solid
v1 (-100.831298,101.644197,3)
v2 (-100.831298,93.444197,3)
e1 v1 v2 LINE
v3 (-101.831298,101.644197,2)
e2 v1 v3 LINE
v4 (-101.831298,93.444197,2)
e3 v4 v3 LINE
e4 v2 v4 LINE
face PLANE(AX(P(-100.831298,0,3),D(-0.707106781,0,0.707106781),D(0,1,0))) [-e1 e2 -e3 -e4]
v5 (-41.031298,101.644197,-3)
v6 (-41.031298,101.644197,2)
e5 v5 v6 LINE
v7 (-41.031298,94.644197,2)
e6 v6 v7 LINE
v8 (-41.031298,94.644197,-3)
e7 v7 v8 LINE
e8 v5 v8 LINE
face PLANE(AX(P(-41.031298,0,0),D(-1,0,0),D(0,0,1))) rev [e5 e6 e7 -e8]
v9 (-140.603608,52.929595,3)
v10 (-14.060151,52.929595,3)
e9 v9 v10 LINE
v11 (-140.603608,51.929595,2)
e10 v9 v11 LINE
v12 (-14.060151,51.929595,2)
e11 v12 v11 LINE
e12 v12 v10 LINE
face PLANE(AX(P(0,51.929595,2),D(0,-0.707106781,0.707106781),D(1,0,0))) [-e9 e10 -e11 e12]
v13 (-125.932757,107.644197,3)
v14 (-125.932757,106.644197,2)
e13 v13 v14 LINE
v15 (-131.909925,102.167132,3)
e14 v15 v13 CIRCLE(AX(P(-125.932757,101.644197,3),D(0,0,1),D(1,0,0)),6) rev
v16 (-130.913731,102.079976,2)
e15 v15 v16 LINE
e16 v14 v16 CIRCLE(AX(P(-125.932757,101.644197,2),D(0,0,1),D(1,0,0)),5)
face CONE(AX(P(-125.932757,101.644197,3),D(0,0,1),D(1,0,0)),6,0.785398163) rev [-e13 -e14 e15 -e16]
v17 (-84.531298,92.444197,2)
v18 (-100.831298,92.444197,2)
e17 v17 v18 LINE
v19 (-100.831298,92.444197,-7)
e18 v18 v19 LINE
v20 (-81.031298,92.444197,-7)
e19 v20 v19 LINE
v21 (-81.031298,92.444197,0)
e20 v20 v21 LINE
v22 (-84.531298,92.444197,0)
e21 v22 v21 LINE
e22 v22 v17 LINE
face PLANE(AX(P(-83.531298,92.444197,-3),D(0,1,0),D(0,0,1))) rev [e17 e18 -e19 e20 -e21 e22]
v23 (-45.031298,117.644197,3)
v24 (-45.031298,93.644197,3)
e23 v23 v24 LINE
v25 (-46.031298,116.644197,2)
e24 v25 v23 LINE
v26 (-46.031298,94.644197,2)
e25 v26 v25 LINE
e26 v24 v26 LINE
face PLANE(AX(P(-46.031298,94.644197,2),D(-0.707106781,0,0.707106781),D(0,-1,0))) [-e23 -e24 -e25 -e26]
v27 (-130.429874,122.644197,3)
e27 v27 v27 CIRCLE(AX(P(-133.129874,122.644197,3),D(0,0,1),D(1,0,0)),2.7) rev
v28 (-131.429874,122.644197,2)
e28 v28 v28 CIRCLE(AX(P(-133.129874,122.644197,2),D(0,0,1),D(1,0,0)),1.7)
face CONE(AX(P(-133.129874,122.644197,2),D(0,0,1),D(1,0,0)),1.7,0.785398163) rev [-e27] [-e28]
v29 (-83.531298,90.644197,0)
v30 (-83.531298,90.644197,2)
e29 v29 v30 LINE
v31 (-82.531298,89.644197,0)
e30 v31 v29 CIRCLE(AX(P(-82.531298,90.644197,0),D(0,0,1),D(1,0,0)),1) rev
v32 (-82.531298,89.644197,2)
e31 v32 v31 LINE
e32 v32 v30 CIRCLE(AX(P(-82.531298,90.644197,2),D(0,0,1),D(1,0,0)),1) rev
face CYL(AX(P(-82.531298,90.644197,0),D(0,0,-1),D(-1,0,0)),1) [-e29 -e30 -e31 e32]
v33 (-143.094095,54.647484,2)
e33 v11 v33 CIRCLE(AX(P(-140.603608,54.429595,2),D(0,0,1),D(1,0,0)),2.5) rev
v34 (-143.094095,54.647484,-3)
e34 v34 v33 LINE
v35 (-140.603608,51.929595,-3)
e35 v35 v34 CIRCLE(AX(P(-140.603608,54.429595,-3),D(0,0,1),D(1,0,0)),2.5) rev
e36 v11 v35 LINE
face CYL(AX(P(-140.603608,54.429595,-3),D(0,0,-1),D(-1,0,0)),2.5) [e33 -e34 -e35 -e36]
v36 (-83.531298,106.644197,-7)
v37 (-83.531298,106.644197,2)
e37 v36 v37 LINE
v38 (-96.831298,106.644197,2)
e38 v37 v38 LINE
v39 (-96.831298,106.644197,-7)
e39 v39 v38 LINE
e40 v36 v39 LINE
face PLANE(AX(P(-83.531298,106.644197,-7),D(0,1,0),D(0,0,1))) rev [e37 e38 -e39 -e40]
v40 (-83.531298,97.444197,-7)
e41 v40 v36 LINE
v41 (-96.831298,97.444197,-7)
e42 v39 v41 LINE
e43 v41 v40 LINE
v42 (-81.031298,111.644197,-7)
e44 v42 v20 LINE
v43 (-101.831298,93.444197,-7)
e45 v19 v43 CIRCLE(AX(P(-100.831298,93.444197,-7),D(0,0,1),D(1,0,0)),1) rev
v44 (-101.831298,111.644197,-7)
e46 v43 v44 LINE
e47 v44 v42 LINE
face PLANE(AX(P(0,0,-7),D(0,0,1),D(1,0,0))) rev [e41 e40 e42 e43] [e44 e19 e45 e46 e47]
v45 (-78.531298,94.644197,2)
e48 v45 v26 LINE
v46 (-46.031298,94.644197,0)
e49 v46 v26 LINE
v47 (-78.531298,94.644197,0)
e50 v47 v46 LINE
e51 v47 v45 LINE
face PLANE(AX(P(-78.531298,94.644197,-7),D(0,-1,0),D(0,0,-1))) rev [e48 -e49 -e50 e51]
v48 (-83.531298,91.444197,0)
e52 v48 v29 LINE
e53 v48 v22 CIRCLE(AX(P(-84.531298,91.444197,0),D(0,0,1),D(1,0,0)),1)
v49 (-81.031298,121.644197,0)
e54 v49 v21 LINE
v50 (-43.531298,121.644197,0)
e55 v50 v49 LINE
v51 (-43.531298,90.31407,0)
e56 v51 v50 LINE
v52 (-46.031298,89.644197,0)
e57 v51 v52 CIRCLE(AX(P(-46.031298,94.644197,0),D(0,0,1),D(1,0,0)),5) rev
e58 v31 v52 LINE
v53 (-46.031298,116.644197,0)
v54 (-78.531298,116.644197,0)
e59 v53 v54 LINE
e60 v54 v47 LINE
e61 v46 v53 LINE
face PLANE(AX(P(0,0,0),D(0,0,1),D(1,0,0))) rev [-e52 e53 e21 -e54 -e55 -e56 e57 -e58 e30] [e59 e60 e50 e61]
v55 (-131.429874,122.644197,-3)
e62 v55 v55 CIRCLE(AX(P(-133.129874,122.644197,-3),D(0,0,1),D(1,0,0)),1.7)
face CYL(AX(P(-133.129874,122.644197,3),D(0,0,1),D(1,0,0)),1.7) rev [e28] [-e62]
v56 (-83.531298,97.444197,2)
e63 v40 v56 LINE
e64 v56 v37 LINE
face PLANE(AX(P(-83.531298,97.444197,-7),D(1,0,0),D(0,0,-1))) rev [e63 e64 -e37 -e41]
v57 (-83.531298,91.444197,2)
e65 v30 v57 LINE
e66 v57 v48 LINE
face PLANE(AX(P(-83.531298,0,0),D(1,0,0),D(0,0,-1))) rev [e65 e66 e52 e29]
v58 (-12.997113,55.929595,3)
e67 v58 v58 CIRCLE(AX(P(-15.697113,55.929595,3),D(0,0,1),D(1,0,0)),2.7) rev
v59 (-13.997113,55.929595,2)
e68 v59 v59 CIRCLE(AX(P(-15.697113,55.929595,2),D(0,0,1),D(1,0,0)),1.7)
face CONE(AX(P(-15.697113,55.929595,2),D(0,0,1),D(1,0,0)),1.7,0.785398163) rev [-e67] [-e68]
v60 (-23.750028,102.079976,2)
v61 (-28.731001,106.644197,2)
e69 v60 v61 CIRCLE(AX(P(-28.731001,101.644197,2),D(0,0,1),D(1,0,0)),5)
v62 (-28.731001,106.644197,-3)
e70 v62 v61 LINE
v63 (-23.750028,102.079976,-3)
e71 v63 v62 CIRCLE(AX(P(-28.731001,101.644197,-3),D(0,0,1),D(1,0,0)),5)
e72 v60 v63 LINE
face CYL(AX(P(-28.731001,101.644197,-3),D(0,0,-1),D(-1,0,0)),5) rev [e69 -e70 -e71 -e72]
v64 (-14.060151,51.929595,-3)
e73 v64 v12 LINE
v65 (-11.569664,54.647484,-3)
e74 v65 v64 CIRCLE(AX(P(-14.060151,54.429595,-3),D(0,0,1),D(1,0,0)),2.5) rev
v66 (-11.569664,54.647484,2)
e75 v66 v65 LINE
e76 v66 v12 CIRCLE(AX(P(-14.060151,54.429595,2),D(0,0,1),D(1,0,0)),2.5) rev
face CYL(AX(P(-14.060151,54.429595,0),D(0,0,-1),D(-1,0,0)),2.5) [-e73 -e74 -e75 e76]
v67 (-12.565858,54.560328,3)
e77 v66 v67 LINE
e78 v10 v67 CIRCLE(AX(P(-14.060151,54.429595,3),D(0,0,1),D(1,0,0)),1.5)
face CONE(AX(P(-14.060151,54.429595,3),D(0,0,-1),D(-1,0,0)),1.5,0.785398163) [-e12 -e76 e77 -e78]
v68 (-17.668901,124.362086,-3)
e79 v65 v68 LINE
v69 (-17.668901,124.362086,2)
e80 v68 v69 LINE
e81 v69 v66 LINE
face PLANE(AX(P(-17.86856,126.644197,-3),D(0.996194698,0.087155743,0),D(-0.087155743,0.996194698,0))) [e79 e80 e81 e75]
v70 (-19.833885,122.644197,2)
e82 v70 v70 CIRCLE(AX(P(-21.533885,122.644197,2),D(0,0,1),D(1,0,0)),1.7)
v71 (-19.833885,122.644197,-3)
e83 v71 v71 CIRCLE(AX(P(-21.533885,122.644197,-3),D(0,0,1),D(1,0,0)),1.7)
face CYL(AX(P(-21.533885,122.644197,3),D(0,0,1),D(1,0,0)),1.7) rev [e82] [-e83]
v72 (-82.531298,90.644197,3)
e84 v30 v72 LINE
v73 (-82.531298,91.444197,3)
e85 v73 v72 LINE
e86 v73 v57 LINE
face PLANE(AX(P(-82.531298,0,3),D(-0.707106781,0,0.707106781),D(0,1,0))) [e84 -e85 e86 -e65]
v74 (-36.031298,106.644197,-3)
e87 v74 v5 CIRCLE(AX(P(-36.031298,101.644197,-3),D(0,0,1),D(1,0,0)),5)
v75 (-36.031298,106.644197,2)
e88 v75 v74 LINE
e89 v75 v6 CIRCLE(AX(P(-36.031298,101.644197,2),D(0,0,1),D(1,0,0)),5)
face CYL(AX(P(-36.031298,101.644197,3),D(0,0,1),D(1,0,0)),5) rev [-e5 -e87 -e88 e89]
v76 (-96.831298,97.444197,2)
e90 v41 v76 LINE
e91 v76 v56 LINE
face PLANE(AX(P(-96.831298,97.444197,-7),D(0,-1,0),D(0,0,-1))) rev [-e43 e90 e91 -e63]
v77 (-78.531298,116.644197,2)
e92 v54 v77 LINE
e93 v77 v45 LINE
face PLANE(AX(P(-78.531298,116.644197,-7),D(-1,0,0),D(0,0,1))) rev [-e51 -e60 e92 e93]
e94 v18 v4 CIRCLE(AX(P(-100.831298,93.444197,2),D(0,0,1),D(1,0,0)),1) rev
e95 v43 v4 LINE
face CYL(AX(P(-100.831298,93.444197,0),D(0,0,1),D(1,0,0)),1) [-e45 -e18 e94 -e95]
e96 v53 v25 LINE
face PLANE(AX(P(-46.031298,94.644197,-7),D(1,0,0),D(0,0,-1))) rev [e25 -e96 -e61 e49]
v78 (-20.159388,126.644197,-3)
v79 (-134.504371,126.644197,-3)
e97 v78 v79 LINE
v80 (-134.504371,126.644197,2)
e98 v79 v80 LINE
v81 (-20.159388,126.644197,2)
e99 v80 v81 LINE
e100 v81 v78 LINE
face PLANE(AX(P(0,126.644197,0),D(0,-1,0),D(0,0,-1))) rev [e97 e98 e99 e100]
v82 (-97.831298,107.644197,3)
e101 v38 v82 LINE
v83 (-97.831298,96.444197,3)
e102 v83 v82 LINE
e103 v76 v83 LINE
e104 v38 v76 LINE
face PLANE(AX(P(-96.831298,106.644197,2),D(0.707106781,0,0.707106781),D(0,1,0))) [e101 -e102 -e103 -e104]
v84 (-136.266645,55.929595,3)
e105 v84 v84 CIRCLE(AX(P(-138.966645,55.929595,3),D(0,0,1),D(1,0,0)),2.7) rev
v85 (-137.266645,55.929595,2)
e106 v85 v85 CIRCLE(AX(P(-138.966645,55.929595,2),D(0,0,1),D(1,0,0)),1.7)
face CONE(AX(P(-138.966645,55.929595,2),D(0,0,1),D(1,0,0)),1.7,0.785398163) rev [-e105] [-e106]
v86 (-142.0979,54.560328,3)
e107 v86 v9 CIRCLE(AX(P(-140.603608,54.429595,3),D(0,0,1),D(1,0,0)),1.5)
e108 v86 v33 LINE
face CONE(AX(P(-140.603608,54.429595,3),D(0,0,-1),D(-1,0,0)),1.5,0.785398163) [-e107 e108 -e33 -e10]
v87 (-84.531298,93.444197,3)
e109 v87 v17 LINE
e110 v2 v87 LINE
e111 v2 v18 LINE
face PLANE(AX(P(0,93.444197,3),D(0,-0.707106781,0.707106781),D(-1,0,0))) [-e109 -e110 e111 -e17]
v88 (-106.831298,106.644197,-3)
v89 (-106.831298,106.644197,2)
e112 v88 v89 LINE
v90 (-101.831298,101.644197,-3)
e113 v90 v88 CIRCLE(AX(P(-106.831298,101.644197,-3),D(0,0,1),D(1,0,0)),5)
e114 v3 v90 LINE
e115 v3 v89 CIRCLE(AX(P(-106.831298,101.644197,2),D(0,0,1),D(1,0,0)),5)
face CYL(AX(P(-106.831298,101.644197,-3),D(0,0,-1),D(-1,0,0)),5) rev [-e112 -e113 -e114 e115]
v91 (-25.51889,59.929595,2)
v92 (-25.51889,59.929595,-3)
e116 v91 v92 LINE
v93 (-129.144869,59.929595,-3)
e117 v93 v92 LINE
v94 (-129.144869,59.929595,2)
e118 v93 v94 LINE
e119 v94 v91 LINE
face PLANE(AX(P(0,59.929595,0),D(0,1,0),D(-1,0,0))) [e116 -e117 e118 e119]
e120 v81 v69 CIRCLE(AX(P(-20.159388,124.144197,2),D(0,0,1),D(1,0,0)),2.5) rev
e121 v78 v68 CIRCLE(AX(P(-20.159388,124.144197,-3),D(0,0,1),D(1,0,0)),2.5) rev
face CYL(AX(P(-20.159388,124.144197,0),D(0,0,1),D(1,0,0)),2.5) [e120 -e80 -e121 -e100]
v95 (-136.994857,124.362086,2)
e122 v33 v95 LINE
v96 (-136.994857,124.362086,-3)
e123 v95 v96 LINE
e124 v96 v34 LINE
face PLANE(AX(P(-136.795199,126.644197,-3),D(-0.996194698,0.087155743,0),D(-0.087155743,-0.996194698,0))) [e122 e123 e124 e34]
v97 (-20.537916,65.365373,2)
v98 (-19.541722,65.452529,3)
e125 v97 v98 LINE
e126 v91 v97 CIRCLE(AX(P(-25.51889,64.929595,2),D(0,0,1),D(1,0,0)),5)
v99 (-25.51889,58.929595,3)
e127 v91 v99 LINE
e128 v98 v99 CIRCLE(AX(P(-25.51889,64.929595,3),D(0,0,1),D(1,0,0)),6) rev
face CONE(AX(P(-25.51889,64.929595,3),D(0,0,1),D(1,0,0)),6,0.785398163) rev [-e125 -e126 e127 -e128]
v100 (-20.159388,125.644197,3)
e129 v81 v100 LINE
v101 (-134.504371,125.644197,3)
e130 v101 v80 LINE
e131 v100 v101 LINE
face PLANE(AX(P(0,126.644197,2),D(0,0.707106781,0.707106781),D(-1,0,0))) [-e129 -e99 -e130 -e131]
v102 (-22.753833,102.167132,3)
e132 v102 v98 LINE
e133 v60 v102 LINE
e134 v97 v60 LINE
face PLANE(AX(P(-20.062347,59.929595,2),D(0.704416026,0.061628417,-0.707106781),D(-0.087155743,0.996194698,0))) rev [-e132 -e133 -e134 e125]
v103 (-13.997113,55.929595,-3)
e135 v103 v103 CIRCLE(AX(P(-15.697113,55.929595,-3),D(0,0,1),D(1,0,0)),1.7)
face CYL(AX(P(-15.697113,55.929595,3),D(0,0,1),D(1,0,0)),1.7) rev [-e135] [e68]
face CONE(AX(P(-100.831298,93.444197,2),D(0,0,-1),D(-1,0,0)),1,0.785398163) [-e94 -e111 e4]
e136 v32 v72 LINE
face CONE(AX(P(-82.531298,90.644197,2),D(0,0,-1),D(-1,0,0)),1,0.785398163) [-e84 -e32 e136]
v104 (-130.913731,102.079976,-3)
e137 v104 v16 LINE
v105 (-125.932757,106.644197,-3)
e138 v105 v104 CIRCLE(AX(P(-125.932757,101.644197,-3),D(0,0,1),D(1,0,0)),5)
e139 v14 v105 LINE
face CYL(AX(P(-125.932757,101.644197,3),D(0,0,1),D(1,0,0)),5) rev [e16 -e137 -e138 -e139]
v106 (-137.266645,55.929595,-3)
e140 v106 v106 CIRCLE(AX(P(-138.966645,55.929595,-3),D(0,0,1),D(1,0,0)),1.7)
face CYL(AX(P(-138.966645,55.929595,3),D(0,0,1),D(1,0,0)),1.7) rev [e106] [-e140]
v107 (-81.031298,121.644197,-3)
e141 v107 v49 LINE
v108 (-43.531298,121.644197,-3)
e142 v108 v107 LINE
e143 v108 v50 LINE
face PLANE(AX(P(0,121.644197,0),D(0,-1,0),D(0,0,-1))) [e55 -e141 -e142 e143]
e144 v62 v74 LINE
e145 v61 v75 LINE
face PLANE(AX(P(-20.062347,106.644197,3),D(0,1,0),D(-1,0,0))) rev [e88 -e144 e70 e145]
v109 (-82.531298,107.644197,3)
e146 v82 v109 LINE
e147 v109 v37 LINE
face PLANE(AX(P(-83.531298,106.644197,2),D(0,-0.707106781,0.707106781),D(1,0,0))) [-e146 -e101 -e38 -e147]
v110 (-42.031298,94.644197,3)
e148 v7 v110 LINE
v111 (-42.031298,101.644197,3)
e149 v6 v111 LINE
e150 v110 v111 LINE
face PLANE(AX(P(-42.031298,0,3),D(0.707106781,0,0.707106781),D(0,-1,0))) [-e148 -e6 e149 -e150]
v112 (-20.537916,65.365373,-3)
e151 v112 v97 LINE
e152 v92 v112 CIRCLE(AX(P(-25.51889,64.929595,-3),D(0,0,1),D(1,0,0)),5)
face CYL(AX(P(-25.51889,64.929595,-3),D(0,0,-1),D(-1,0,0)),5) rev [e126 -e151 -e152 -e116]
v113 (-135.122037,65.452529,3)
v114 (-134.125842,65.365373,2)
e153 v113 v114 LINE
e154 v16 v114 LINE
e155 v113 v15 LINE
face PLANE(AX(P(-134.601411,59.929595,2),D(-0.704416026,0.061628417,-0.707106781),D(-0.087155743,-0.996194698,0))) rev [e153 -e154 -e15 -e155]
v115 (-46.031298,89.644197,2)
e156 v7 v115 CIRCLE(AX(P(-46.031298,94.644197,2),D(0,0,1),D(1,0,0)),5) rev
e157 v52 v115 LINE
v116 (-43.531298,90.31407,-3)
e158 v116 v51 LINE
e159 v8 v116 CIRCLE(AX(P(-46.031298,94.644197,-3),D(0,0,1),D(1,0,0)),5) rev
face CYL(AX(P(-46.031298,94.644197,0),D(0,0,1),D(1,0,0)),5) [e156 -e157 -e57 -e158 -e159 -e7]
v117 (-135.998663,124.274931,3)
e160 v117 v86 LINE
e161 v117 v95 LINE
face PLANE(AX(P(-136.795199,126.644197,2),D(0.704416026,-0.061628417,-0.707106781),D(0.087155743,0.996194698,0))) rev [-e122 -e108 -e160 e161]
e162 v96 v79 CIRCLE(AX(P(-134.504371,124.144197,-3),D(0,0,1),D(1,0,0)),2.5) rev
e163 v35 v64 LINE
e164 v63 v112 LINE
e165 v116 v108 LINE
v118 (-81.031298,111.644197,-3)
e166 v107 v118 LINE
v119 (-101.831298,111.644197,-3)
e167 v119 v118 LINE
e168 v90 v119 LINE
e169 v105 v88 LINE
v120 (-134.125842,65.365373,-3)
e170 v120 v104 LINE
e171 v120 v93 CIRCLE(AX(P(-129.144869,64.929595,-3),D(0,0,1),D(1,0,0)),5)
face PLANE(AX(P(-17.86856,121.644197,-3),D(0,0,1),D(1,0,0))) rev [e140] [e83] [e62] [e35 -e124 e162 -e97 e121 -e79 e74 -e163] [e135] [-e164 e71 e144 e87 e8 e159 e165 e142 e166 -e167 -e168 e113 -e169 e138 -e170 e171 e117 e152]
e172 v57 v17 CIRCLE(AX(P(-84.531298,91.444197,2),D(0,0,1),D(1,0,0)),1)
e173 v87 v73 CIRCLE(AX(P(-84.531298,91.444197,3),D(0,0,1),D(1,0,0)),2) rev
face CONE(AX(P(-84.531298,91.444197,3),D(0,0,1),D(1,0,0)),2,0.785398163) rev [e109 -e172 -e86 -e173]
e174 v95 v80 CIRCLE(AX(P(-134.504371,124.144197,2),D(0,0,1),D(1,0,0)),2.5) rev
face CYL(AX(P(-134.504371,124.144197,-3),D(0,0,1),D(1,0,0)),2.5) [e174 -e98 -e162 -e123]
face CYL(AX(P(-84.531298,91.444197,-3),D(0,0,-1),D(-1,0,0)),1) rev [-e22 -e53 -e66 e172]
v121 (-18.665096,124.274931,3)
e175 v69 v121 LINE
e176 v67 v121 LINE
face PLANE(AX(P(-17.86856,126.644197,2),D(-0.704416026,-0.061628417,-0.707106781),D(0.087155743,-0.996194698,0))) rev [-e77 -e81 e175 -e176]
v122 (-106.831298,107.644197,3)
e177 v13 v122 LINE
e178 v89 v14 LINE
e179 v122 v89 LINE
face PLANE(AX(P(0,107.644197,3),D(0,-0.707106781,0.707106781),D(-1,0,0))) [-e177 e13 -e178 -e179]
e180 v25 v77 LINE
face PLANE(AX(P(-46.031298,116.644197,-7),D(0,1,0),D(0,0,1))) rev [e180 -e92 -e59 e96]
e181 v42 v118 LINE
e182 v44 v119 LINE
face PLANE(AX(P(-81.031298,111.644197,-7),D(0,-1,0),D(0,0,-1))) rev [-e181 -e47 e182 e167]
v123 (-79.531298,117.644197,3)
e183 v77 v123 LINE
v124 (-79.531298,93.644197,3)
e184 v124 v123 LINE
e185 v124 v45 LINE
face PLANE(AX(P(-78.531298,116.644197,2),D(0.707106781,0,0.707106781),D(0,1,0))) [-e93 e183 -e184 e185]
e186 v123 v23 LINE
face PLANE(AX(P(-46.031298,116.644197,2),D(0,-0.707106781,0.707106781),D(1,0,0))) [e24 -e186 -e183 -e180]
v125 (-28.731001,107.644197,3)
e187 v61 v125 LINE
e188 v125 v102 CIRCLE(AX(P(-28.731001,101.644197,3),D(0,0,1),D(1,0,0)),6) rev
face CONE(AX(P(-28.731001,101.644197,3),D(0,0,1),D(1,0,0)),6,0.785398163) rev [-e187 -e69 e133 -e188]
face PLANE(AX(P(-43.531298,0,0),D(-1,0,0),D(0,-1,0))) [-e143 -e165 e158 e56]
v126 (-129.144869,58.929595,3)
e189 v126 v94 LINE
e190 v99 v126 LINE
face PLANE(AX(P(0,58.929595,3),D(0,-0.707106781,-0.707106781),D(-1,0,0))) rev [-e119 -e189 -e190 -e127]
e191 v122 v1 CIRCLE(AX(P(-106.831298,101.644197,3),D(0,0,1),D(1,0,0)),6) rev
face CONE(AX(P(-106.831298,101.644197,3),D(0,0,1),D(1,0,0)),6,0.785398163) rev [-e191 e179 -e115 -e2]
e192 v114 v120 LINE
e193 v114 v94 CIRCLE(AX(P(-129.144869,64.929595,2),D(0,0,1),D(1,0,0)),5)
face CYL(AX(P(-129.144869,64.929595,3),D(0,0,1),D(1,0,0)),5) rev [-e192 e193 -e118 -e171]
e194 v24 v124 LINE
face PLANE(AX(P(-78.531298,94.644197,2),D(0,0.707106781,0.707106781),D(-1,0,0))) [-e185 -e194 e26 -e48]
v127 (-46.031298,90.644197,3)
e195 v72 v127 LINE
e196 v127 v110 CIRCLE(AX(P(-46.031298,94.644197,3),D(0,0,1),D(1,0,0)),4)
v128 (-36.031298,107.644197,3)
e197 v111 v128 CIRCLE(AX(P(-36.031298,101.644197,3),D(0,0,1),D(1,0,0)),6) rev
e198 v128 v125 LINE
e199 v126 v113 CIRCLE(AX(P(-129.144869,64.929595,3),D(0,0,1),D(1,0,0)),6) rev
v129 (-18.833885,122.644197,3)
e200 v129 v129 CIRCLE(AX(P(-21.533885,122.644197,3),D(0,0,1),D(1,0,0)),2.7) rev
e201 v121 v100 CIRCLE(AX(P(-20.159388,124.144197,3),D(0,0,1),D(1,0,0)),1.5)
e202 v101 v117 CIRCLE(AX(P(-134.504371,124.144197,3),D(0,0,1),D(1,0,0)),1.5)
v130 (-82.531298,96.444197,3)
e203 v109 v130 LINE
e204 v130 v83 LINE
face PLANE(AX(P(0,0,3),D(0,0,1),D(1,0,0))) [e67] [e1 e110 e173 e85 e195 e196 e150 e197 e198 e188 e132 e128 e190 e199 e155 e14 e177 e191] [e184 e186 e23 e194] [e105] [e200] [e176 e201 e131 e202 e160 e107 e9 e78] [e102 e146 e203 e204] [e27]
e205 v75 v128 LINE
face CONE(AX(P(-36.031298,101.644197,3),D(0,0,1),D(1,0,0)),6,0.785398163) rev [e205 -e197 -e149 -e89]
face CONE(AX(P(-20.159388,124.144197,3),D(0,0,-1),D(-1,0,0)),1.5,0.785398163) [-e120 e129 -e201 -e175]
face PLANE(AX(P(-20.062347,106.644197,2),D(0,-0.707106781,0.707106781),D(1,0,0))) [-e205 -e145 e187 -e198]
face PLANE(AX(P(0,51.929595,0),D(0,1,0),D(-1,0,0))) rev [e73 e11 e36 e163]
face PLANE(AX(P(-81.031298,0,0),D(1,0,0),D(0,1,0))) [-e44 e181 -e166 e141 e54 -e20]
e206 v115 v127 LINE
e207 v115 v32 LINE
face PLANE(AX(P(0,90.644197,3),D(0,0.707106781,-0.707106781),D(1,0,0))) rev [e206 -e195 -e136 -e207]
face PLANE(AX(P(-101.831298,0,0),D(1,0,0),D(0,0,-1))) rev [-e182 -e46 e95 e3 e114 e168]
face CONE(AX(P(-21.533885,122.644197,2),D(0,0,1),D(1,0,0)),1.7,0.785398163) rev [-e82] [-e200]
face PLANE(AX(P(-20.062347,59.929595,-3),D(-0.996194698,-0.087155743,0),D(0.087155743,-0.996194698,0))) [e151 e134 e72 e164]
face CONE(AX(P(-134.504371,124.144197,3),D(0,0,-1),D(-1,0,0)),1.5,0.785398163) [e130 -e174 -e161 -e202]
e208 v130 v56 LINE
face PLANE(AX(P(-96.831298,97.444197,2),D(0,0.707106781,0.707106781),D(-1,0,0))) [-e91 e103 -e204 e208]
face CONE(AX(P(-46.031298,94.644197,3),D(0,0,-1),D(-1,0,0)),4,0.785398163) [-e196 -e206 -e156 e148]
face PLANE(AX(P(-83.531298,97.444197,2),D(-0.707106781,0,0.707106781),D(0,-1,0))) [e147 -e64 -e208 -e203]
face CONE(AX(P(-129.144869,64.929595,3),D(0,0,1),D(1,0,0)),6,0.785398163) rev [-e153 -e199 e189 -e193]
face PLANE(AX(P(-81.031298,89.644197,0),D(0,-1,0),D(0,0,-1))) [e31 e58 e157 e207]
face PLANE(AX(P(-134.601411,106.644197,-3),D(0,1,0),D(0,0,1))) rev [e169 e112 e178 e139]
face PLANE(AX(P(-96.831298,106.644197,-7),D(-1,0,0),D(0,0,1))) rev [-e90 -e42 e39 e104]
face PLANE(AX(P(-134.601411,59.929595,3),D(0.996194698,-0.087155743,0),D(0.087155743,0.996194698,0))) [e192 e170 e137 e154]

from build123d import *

# Parameters (mm, degrees)
SKETCH1_W                 = 37.50000004
SKETCH1_H                 = 31.999999963
BOSS_EXTRUDE1_DEPTH       = 3
SKETCH2_W                 = 6
SKETCH2_H                 = 61.71460232
BOSS_EXTRUDE2_DEPTH       = 25.662738028
SKETCH3_W                 = 63.162738068
SKETCH3_H                 = 6
BOSS_EXTRUDE3_DEPTH       = 5.000000037
SKETCH4_W                 = 63.162738068
SKETCH4_H                 = 6
BOSS_EXTRUDE4_DEPTH       = 8
SKETCH5_W                 = 6
SKETCH5_H                 = 74.714602357
BOSS_EXTRUDE5_DEPTH       = 55.76390052
CUT_EXTRUDE1_DEPTH        = 2.499999998
SKETCH7_W                 = 6
SKETCH7_H                 = 32.514602357
CUT_EXTRUDE2_DEPTH        = 18.3
SKETCH8_W                 = 6
SKETCH8_H                 = 29.714602357
CUT_EXTRUDE3_DEPTH        = 2.5
SKETCH9_W                 = 6
SKETCH9_H                 = 46.714602358
CUT_EXTRUDE4_DEPTH        = 20.968950764
SKETCH10_W                = 6
SKETCH10_H                = 46.714602357
CUT_EXTRUDE5_DEPTH        = 32.770113219
SKETCH11_W                = 20.8
SKETCH11_H                = 19.200000012
BOSS_EXTRUDE6_DEPTH       = 4
SKETCH12_W                = 32.5
SKETCH12_H                = 22
CUT_EXTRUDE6_DEPTH        = 187.686043948
SKETCH13_W                = 13.3
SKETCH13_H                = 9.2
CUT_EXTRUDE7_DEPTH        = 187.686043948
DRAFT1_ANGLE              = -5
DRAFT2_ANGLE              = 5
F_4_CLEARANCE_HOLE1_D     = 3.4
F_4_CLEARANCE_HOLE1_DEPTH = 10
FILLET1_R                 = 1
FILLET2_R                 = 2.5
FILLET3_R                 = 5
CHAMFER1_SIZE             = 1


with BuildPart() as part:
    # Sketch1 → Boss-Extrude1 (new body)
    with BuildSketch(Plane.XY.offset(3)):
        with Locations((-62.281298008, 105.644197082)):
            Rectangle(SKETCH1_W, SKETCH1_H)
    extrude(amount=-BOSS_EXTRUDE1_DEPTH)

    # Sketch2 → Boss-Extrude2 (add)
    with BuildSketch(Plane(origin=(-43.531297988, 0, 0), x_dir=(0, 0, -1), z_dir=(1, 0, 0))):
        with Locations((0, 90.786895904)):
            Rectangle(SKETCH2_W, SKETCH2_H)
    extrude(amount=BOSS_EXTRUDE2_DEPTH)

    # Sketch3 → Boss-Extrude3 (add)
    with BuildSketch(Plane(origin=(0, 121.644197064, 0), x_dir=(-1, 0, 0), z_dir=(0, 1, 0))):
        with Locations((49.449928994, 0)):
            Rectangle(SKETCH3_W, SKETCH3_H)
    extrude(amount=BOSS_EXTRUDE3_DEPTH)

    # Sketch4 → Boss-Extrude4 (add)
    with BuildSketch(Plane.XZ.offset(-59.929594744)):
        with Locations((-49.449928994, 0)):
            Rectangle(SKETCH4_W, SKETCH4_H)
    extrude(amount=BOSS_EXTRUDE4_DEPTH)

    # Sketch5 → Boss-Extrude5 (add)
    with BuildSketch(Plane.ZY.offset(81.031298028)):
        with Locations((0, 89.286895923)):
            Rectangle(SKETCH5_W, SKETCH5_H)
    extrude(amount=BOSS_EXTRUDE5_DEPTH)

    # Sketch6 → Cut-Extrude1 (cut)
    with BuildSketch(Plane(origin=(-81.031298028, 0, 0), x_dir=(0, 0, -1), z_dir=(1, 0, 0))):
        Polygon((0, 89.644197101), (-3, 89.644197101), (-3, 59.929594744), (3, 59.929594744), (3, 92.444197101), (0, 92.444197101), align=None)
    extrude(amount=-CUT_EXTRUDE1_DEPTH, mode=Mode.SUBTRACT)

    # Sketch7 → Cut-Extrude2 (cut)
    with BuildSketch(Plane(origin=(-83.531298026, 0, 0), x_dir=(0, 0, -1), z_dir=(1, 0, 0))):
        with Locations((0, 76.186895922)):
            Rectangle(SKETCH7_W, SKETCH7_H)
    extrude(amount=-CUT_EXTRUDE2_DEPTH, mode=Mode.SUBTRACT)

    # Sketch8 → Cut-Extrude3 (cut)
    with BuildSketch(Plane.ZY.offset(43.531297988)):
        with Locations((0, 74.786895923)):
            Rectangle(SKETCH8_W, SKETCH8_H)
    extrude(amount=-CUT_EXTRUDE3_DEPTH, mode=Mode.SUBTRACT)

    # Sketch9 → Cut-Extrude4 (cut)
    with BuildSketch(Plane.ZY.offset(41.031297988)):
        with Locations((-1.31e-07, 83.286895949)):
            Rectangle(SKETCH9_W, SKETCH9_H)
    extrude(amount=-CUT_EXTRUDE4_DEPTH, mode=Mode.SUBTRACT)

    # Sketch10 → Cut-Extrude5 (cut)
    with BuildSketch(Plane(origin=(-101.831298026, 0, 0), x_dir=(0, 0, -1), z_dir=(1, 0, 0))):
        with Locations((0, 83.286895923)):
            Rectangle(SKETCH10_W, SKETCH10_H)
    extrude(amount=-CUT_EXTRUDE5_DEPTH, mode=Mode.SUBTRACT)

    # Sketch11 → Boss-Extrude6 (add)
    with BuildSketch(Plane(origin=(0, 0, -3), x_dir=(-1, 0, 0), z_dir=(0, 0, -1))):
        with Locations((91.431298026, 102.044197107)):
            Rectangle(SKETCH11_W, SKETCH11_H)
    extrude(amount=BOSS_EXTRUDE6_DEPTH)

    # Sketch12 → Cut-Extrude6 (cut, through all)
    with BuildSketch(Plane.XY.offset(3)):
        with Locations((-62.281298026, 105.644197101)):
            Rectangle(SKETCH12_W, SKETCH12_H)
    extrude(amount=-CUT_EXTRUDE6_DEPTH, mode=Mode.SUBTRACT)

    # Sketch13 → Cut-Extrude7 (cut, through all)
    with BuildSketch(Plane.XY.offset(3)):
        with Locations((-90.181298026, 102.044197101)):
            Rectangle(SKETCH13_W, SKETCH13_H)
    extrude(amount=-CUT_EXTRUDE7_DEPTH, mode=Mode.SUBTRACT)

    # Draft1
    draft1_faces = [part.faces().sort_by_distance(p)[0] for p in [
        (-20.062347224, 83.286895949, -1.31e-07),
        (-134.601411245, 83.286895923, 0),
    ]]
    draft(draft1_faces, Plane(origin=(0, 59.929594744, 0), x_dir=(1, 0, 0), z_dir=(0, 1, 0)), DRAFT1_ANGLE)

    # Draft2
    draft2_faces = [part.faces().sort_by_distance(p)[0] for p in [
        (-136.795198548, 89.286895923, 0),
        (-17.86855996, 89.286895923, 0),
    ]]
    draft(draft2_faces, Plane.ZX.offset(126.644197101), DRAFT2_ANGLE)

    # #4 Clearance Hole1
    with Locations(Plane.XY.offset(3)):
        with Locations((-21.533884656, 122.644197101), (-133.129873852, 122.644197101), (-138.966645249, 55.929594744), (-15.697113258, 55.929594744)):
            Hole(F_4_CLEARANCE_HOLE1_D / 2, depth=F_4_CLEARANCE_HOLE1_DEPTH)

    # Fillet1
    fillet1_edges = [part.edges().sort_by_distance(p)[0] for p in [
        (-83.531298026, 89.644197101, 1.5),
        (-101.831298026, 92.444197101, -2),
        (-83.531298026, 92.444197101, 1.5),
    ]]
    fillet(fillet1_edges, radius=FILLET1_R)

    # Fillet2
    fillet2_edges = [part.edges().sort_by_distance(p)[0] for p in [
        (-17.86855996, 126.644197101, 0),
        (-11.331879254, 51.929594744, 0),
        (-136.795198548, 126.644197101, 0),
        (-143.331879255, 51.929594744, 0),
    ]]
    fillet(fillet2_edges, radius=FILLET2_R)

    # Fillet3
    fillet3_edges = [part.edges().sort_by_distance(p)[0] for p in [
        (-101.831298026, 106.644197101, 0),
        (-41.031297988, 106.644197128, -1.31e-07),
        (-41.031297988, 89.644197101, 0),
        (-20.062347226, 59.92959477, 0),
        (-24.149345354, 106.644197128, 0),
        (-130.514413118, 106.644197101, 0),
        (-134.601411243, 59.92959477, 0),
    ]]
    fillet(fillet3_edges, radius=FILLET3_R)

    # Chamfer1
    chamfer1_edges = [part.edges().sort_by_distance(p)[0] for p in [
        (-46.031298026, 105.644197101, 3),
        (-62.281298026, 116.644197101, 3),
        (-78.531298026, 105.644197101, 3),
        (-62.281298026, 94.644197101, 3),
        (-90.181298026, 106.644197101, 3),
        (-96.831298026, 102.044197101, 3),
        (-90.181298026, 97.444197101, 3),
        (-83.531298026, 102.044197101, 3),
        (-13.997113258, 55.929594744, 3),
        (-137.266645249, 55.929594744, 3),
        (-131.429873852, 122.644197101, 3),
        (-19.833884656, 122.644197101, 3),
        (-92.681298026, 92.444197101, 3),
        (-83.531298026, 91.044197101, 3),
        (-64.281298007, 89.644197101, 3),
        (-101.538404807, 92.73709032, 3),
        (-83.238404807, 89.93709032, 3),
        (-83.824191245, 92.151303882, 3),
        (-77.331879254, 51.929594744, 3),
        (-77.331879254, 126.644197101, 3),
        (-140.044476053, 89.504785279, 3),
        (-14.619282455, 89.504785279, 3),
        (-136.193346132, 125.987390443, 3),
        (-18.470412376, 125.987390443, 3),
        (-142.446801344, 52.740619225, 3),
        (-12.216957164, 52.740619225, 3),
        (-116.382027637, 106.644197101, 3),
        (-101.831298026, 97.544197101, 3),
        (-32.381149606, 106.644197128, 2.999999869),
        (-41.031297988, 98.144197115, 2.999999869),
        (-22.143971987, 83.722674663, 3),
        (-61.031298008, 59.929594744, 3),
        (-132.519786483, 83.722674649, 3),
        (-42.495764082, 91.108663195, 3),
        (-103.29576412, 105.179731007, 3),
        (-39.566831894, 105.179731034, 3),
        (-21.832503047, 61.551643732, 3),
        (-25.353050186, 105.330583812, 3),
        (-129.310708286, 105.330583785, 3),
        (-132.831255421, 61.551643732, 3),
    ]]
    chamfer(chamfer1_edges, length=CHAMFER1_SIZE - 0.0001)  # a hair under: the kernel refuses the full size


solid = part.part
